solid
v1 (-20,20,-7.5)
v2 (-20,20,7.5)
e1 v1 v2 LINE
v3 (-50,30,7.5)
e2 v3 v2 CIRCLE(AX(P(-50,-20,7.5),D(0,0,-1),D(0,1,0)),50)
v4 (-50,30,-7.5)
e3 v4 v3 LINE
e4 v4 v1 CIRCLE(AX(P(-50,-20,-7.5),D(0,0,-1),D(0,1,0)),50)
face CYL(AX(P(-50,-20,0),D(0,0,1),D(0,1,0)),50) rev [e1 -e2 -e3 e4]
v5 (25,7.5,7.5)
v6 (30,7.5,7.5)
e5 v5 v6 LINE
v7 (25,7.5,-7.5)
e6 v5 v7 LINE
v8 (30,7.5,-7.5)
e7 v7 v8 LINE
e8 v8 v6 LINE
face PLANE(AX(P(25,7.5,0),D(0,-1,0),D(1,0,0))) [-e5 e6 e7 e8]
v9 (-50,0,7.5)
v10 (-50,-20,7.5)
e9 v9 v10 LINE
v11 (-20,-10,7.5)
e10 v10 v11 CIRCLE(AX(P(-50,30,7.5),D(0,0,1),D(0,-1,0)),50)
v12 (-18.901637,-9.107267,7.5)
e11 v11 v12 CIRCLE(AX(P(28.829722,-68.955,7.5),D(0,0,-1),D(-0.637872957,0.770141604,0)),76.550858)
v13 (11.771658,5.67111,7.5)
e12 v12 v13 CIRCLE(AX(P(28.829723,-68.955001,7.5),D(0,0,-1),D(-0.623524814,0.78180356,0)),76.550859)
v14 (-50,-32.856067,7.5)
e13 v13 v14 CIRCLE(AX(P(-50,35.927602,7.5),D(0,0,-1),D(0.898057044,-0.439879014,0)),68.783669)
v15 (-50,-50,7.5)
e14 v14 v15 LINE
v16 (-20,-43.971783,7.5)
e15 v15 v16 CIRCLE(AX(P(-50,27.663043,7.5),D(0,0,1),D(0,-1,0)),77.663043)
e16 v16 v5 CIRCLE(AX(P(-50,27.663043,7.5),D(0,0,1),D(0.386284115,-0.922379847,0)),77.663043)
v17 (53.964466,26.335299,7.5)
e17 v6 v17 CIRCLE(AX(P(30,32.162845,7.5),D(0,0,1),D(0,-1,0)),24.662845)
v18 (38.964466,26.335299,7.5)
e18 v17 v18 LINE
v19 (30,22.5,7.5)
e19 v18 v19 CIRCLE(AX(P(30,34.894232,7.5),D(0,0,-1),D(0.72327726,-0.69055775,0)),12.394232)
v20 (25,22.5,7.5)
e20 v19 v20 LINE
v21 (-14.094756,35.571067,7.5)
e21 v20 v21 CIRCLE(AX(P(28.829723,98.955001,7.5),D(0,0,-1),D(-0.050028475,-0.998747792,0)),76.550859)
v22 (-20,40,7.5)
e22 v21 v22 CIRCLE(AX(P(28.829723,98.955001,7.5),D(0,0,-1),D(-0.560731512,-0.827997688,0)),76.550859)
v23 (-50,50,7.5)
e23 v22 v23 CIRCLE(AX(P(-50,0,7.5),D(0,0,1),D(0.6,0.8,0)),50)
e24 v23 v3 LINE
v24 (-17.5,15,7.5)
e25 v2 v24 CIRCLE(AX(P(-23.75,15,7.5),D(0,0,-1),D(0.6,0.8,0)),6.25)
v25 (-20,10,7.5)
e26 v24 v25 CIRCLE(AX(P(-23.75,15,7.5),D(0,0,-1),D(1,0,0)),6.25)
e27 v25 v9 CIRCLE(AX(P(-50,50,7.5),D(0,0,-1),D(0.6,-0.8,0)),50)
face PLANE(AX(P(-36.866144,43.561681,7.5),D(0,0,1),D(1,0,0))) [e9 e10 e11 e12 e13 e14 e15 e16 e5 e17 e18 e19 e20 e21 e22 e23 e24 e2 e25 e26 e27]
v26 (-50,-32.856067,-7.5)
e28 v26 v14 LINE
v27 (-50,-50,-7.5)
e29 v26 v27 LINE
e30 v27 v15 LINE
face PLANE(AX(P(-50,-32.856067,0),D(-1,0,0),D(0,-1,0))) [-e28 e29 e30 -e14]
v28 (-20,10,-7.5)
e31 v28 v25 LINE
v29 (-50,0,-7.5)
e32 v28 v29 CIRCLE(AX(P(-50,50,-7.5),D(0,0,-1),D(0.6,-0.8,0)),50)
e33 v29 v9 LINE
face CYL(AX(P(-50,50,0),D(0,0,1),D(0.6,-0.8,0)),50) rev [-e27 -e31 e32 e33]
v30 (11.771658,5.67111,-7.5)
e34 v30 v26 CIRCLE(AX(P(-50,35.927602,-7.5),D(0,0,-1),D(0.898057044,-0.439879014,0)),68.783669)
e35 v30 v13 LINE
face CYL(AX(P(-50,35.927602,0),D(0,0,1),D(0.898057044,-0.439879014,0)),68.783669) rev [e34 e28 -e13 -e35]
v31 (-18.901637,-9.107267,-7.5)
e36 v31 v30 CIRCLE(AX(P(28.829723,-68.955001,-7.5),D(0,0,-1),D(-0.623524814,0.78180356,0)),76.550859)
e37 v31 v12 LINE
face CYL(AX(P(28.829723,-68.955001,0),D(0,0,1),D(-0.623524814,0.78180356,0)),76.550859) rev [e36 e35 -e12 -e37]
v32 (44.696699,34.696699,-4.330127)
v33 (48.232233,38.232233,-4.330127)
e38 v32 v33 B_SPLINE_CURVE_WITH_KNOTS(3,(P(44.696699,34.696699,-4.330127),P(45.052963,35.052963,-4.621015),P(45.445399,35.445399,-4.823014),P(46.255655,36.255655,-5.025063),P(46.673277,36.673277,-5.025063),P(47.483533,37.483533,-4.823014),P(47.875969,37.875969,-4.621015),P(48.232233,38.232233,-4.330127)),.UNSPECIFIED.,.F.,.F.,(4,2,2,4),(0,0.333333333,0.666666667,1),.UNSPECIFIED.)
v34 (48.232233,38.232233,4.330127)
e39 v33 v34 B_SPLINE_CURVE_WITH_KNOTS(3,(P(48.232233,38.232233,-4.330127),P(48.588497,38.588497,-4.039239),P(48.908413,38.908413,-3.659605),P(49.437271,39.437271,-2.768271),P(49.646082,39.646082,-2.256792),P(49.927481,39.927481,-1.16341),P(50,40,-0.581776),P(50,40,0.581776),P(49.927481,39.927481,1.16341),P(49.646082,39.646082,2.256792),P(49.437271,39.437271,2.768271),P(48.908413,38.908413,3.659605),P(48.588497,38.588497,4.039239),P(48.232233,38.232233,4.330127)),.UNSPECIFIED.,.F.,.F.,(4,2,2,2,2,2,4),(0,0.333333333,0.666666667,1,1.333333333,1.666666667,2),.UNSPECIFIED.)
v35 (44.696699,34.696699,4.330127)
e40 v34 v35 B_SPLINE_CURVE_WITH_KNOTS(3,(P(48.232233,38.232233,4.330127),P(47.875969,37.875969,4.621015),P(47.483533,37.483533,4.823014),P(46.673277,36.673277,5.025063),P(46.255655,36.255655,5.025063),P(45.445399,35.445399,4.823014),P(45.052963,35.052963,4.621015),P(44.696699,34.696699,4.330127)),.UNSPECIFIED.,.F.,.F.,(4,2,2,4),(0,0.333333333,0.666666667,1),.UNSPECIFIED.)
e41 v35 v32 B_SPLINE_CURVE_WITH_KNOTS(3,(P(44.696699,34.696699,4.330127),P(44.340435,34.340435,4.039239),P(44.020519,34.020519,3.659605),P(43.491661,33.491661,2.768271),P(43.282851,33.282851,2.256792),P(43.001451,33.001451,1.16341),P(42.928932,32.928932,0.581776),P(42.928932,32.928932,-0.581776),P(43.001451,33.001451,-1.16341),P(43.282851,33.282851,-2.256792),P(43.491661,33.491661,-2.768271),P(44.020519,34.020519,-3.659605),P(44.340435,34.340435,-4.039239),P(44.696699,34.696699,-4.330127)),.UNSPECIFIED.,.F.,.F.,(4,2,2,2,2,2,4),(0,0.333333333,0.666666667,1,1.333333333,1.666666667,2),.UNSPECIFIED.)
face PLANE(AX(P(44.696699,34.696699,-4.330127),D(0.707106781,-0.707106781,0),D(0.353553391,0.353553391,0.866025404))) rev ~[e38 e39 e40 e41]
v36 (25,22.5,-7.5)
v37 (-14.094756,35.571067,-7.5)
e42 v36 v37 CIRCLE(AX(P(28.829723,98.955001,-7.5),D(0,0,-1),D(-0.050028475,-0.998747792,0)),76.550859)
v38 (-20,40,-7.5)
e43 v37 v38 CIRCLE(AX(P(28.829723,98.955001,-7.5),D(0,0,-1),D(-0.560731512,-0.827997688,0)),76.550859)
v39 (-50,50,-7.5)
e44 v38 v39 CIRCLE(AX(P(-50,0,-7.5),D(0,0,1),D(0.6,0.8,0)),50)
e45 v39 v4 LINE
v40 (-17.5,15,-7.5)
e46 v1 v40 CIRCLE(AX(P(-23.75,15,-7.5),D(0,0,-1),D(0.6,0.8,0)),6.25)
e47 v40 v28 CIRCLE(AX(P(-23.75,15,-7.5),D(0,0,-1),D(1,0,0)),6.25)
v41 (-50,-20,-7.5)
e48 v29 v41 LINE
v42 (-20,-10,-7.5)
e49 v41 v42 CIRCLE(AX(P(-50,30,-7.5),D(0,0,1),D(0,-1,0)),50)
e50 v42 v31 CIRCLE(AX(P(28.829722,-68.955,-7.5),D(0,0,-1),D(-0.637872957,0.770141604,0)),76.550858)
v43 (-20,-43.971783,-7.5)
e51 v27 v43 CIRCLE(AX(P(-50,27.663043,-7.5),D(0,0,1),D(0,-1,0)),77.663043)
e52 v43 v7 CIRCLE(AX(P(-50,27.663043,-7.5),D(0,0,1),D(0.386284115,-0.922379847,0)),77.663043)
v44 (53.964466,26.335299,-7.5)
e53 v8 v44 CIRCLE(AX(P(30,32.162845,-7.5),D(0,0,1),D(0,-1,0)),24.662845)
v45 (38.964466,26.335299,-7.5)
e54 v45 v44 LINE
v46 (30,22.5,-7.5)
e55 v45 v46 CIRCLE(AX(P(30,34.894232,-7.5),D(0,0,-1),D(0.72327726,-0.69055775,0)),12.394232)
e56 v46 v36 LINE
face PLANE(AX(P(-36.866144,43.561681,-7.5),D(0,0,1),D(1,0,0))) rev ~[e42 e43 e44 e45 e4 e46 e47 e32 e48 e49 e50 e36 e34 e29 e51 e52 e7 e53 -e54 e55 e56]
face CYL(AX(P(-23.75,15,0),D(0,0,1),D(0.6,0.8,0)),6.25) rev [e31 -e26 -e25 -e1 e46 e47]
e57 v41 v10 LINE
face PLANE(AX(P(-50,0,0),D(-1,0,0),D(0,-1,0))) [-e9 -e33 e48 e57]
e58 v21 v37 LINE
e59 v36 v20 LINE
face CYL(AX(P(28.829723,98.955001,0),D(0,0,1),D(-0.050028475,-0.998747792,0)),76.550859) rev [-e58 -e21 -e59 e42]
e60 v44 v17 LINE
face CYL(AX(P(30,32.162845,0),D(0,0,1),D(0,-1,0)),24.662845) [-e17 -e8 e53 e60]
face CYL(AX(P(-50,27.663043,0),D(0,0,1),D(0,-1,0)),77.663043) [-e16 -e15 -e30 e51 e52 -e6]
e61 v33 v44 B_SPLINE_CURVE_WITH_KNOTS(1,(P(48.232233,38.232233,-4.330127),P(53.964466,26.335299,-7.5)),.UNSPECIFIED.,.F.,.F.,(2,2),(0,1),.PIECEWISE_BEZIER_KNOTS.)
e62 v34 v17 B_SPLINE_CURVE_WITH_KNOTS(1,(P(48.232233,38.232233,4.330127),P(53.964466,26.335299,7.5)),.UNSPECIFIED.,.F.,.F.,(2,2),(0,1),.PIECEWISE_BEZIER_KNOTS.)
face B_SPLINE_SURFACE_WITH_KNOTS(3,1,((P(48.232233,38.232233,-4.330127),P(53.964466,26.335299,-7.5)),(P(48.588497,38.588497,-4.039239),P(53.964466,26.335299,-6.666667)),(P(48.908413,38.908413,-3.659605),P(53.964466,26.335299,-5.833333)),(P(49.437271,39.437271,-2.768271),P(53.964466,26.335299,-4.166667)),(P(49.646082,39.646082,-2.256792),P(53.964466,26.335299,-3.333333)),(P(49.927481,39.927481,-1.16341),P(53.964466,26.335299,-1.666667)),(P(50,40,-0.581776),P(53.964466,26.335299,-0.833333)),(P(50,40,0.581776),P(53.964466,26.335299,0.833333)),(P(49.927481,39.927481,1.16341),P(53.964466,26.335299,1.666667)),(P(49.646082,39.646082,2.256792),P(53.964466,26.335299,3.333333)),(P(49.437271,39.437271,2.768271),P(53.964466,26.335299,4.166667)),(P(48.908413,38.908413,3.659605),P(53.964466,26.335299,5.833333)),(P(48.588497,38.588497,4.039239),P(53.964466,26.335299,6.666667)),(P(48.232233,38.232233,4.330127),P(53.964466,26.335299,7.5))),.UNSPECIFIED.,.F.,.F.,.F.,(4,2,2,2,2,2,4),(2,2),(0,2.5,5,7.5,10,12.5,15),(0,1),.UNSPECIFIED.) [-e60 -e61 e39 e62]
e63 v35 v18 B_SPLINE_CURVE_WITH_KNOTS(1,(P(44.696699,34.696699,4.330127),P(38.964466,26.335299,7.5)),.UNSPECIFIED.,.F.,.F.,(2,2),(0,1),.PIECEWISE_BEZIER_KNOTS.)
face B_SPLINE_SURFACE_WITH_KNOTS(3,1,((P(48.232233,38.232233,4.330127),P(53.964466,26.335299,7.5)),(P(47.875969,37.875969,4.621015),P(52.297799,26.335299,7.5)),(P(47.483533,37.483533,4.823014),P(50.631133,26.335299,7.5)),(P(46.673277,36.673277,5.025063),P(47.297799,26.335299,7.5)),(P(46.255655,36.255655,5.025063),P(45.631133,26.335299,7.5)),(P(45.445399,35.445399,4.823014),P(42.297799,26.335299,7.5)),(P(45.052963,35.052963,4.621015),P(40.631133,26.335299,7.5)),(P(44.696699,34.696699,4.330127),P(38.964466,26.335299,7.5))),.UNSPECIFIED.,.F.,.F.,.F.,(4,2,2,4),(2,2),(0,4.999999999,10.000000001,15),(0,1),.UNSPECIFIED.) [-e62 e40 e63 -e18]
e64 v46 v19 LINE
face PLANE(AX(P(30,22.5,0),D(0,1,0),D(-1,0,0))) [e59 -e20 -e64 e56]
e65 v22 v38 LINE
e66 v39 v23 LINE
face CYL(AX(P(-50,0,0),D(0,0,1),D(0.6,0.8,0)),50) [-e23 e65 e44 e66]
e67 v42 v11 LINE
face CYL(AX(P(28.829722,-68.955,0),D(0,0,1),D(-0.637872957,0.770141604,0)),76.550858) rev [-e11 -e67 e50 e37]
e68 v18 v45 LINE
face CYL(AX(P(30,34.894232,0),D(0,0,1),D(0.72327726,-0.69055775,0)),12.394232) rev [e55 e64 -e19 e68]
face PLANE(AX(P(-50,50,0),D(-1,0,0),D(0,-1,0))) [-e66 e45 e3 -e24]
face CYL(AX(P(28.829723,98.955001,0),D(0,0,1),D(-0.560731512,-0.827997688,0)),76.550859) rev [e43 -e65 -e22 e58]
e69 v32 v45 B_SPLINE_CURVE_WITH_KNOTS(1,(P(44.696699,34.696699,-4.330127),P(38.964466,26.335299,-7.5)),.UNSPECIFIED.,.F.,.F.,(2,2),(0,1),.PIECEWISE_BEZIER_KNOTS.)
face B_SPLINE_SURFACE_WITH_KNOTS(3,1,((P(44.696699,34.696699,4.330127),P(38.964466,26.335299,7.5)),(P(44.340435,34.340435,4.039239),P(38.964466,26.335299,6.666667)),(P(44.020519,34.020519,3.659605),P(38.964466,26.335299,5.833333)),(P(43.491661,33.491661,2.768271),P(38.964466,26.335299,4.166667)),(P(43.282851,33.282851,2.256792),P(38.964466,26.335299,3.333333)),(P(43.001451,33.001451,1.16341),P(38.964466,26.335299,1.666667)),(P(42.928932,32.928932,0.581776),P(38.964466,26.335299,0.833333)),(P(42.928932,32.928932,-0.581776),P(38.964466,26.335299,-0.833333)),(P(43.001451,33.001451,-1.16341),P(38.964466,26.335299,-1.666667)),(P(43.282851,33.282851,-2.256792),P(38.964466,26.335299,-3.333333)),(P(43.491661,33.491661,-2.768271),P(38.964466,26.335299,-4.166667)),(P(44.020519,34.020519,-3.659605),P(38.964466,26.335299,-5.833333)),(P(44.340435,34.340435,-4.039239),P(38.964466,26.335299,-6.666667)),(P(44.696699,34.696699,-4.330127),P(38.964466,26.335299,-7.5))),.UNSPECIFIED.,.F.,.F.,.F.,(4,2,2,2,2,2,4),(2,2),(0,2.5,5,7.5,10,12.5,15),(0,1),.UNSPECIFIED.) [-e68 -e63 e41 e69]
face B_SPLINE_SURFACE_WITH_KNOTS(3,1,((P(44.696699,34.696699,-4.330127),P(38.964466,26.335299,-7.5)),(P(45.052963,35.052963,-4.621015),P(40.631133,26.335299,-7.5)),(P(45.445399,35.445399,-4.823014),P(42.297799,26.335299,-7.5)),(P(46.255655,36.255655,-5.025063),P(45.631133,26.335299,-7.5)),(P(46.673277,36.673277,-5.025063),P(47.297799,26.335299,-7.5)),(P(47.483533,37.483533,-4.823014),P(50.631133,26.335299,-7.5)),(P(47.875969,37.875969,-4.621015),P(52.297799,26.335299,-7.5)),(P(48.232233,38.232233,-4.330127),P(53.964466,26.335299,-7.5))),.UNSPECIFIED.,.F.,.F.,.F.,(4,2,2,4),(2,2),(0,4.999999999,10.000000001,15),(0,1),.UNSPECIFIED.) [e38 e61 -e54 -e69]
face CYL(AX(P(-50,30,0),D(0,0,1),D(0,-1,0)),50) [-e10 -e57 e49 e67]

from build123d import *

# Parameters (mm, degrees)
F17_DEPTH = 7.5
F19_DEPTH = 7.5
F20_DEPTH = 7.5


# Not quite as in the source:
# - the arcs of a loft's sections are written as splines that run evenly, so that the points pair up as in the source's solid


with BuildPart() as f9:
    # F2 (on face) → F9 section 0
    with BuildSketch(Plane(origin=(5, -5, 0), x_dir=(0.7071067812, 0.7071067812, 0), z_dir=(0.7071067812, -0.7071067812, 0))):
        with BuildLine():
            add(Edge.make_bspline(
                [(53.6396103068, 0), (53.6396103068, -0.5817764173), (53.7421679492, -1.1634097103), (54.1401264565, -2.2567917229), (54.4354294185, -2.7682714568), (55.1833467639, -3.6596046401), (55.6357771501, -4.0392388103), (56.1396103068, -4.3301270189)],
                knots=[0, 0, 0, 0, 0.3333333333, 0.3333333333, 0.6666666667, 0.6666666667, 1, 1, 1, 1], degree=3))
            add(Edge.make_bspline(
                [(56.1396103068, -4.3301270189), (56.6434434635, -4.6210152276), (57.1984314921, -4.8230143504), (58.3443073448, -5.0250631797), (58.9349132688, -5.0250631797), (60.0807891214, -4.8230143504), (60.6357771501, -4.6210152276), (61.1396103068, -4.3301270189)],
                knots=[0, 0, 0, 0, 0.3333333333, 0.3333333333, 0.6666666667, 0.6666666667, 1, 1, 1, 1], degree=3))
            add(Edge.make_bspline(
                [(61.1396103068, -4.3301270189), (61.6434434635, -4.0392388103), (62.0958738497, -3.6596046401), (62.8437911951, -2.7682714568), (63.1390941571, -2.2567917229), (63.5370526644, -1.1634097103), (63.6396103068, -0.5817764173), (63.6396103068, 0)],
                knots=[0, 0, 0, 0, 0.3333333333, 0.3333333333, 0.6666666667, 0.6666666667, 1, 1, 1, 1], degree=3))
            add(Edge.make_bspline(
                [(63.6396103068, 0), (63.6396103068, 0.5817764173), (63.5370526644, 1.1634097103), (63.1390941571, 2.2567917229), (62.8437911951, 2.7682714568), (62.0958738497, 3.6596046401), (61.6434434635, 4.0392388103), (61.1396103068, 4.3301270189)],
                knots=[0, 0, 0, 0, 0.3333333333, 0.3333333333, 0.6666666667, 0.6666666667, 1, 1, 1, 1], degree=3))
            add(Edge.make_bspline(
                [(61.1396103068, 4.3301270189), (60.6357771501, 4.6210152276), (60.0807891214, 4.8230143504), (58.9349132688, 5.0250631797), (58.3443073448, 5.0250631797), (57.1984314921, 4.8230143504), (56.6434434635, 4.6210152276), (56.1396103068, 4.3301270189)],
                knots=[0, 0, 0, 0, 0.3333333333, 0.3333333333, 0.6666666667, 0.6666666667, 1, 1, 1, 1], degree=3))
            add(Edge.make_bspline(
                [(56.1396103068, 4.3301270189), (55.6357771501, 4.0392388103), (55.1833467639, 3.6596046401), (54.4354294185, 2.7682714568), (54.1401264565, 2.2567917229), (53.7421679492, 1.1634097103), (53.6396103068, 0.5817764173), (53.6396103068, 0)],
                knots=[0, 0, 0, 0, 0.3333333333, 0.3333333333, 0.6666666667, 0.6666666667, 1, 1, 1, 1], degree=3))
        make_face()
    # F8 (on plane+point) → F9 section 1
    with BuildSketch(Plane.XZ.offset(-26.335299015)):
        Polygon((38.9644660941, 7.5), (38.9644660941, 0), (38.9644660941, -7.5), (53.9644660941, -7.5), (53.9644660941, 0), (53.9644660941, 7.5), align=None)
    loft(ruled=True)

    # F16 (on plane+point) → F17 (join, symmetric)
    with BuildSketch(Plane.XY):
        with BuildLine():
            ThreePointArc((38.9644660941, 26.335299015), (34.8752223254, 23.4990929499), (30, 22.5))
            Line((30, 22.5), (30, 7.5))
            ThreePointArc((30, 7.5), (45.2402766064, 12.7723861725), (53.9644660941, 26.335299015))
            Line((53.9644660941, 26.335299015), (38.9644660941, 26.335299015))
        make_face()
    extrude(amount=F17_DEPTH, both=True)

    # F18 (on Top) → F19 (join, symmetric)
    with BuildSketch(Plane.XY):
        Polygon((30, 7.5), (30, 22.5), (25, 22.5), (25, 15), (25, 7.5), align=None)
    extrude(amount=F19_DEPTH, both=True)

    # F18 (on Top) → F20 (join, symmetric)
    with BuildSketch(Plane.XY):
        with BuildLine():
            Line((-50, 40), (-20, 40))
            ThreePointArc((-20, 40), (-34.1886116992, 47.4341649025), (-50, 50))
            Line((-50, 50), (-50, 40))
        make_face()
        with BuildLine():
            Line((25, 15), (25, 22.5))
            ThreePointArc((25, 22.5), (4.5562384252, 26.3545057073), (-14.0947561264, 35.5710670948))
            ThreePointArc((-14.0947561264, 35.5710670948), (-17.1007926042, 37.7143141594), (-20, 40))
            Line((-20, 40), (-50, 40))
            Line((-50, 40), (-50, 30))
            ThreePointArc((-50, 30), (-34.1886116992, 27.4341649025), (-20, 20))
            ThreePointArc((-20, 20), (-18.1598300563, 17.7950849719), (-17.5, 15))
            Line((-17.5, 15), (10, 15))
            Line((10, 15), (25, 15))
        make_face()
        with BuildLine():
            ThreePointArc((-20, -43.971782705), (8.4686762609, -23.4540986425), (25, 7.5))
            ThreePointArc((25, 7.5), (18.3458720417, 6.87456335), (11.7716580953, 5.6711096222))
            ThreePointArc((11.7716580953, 5.6711096222), (-13.5991721952, -22.4348243888), (-50, -32.8560667038))
            Line((-50, -32.8560667038), (-50, -42.8560667038))
            Line((-50, -42.8560667038), (-50, -50))
            ThreePointArc((-50, -50), (-34.7001682709, -48.4780326329), (-20, -43.971782705))
        make_face()
        with BuildLine():
            Line((25, 7.5), (25, 15))
            Line((25, 15), (10, 15))
            Line((10, 15), (11.7716580953, 5.6711096222))
            ThreePointArc((11.7716580953, 5.6711096222), (18.3458720417, 6.87456335), (25, 7.5))
        make_face()
        with BuildLine():
            Line((11.7716580953, 5.6711096222), (10, 15))
            Line((10, 15), (-17.5, 15))
            ThreePointArc((-17.5, 15), (-18.1598300563, 12.2049150281), (-20, 10))
            ThreePointArc((-20, 10), (-34.1886116992, 2.5658350975), (-50, 0))
            Line((-50, 0), (-50, -20))
            ThreePointArc((-50, -20), (-34.1886116992, -17.4341649025), (-20, -10))
            ThreePointArc((-20, -10), (-19.4528820076, -9.5510950315), (-18.9016373284, -9.1072672811))
            ThreePointArc((-18.9016373284, -9.1072672811), (-4.3970359749, 0.0088769739), (11.7716580953, 5.6711096222))
        make_face()
    extrude(amount=F20_DEPTH, both=True)


solid = f9.part
